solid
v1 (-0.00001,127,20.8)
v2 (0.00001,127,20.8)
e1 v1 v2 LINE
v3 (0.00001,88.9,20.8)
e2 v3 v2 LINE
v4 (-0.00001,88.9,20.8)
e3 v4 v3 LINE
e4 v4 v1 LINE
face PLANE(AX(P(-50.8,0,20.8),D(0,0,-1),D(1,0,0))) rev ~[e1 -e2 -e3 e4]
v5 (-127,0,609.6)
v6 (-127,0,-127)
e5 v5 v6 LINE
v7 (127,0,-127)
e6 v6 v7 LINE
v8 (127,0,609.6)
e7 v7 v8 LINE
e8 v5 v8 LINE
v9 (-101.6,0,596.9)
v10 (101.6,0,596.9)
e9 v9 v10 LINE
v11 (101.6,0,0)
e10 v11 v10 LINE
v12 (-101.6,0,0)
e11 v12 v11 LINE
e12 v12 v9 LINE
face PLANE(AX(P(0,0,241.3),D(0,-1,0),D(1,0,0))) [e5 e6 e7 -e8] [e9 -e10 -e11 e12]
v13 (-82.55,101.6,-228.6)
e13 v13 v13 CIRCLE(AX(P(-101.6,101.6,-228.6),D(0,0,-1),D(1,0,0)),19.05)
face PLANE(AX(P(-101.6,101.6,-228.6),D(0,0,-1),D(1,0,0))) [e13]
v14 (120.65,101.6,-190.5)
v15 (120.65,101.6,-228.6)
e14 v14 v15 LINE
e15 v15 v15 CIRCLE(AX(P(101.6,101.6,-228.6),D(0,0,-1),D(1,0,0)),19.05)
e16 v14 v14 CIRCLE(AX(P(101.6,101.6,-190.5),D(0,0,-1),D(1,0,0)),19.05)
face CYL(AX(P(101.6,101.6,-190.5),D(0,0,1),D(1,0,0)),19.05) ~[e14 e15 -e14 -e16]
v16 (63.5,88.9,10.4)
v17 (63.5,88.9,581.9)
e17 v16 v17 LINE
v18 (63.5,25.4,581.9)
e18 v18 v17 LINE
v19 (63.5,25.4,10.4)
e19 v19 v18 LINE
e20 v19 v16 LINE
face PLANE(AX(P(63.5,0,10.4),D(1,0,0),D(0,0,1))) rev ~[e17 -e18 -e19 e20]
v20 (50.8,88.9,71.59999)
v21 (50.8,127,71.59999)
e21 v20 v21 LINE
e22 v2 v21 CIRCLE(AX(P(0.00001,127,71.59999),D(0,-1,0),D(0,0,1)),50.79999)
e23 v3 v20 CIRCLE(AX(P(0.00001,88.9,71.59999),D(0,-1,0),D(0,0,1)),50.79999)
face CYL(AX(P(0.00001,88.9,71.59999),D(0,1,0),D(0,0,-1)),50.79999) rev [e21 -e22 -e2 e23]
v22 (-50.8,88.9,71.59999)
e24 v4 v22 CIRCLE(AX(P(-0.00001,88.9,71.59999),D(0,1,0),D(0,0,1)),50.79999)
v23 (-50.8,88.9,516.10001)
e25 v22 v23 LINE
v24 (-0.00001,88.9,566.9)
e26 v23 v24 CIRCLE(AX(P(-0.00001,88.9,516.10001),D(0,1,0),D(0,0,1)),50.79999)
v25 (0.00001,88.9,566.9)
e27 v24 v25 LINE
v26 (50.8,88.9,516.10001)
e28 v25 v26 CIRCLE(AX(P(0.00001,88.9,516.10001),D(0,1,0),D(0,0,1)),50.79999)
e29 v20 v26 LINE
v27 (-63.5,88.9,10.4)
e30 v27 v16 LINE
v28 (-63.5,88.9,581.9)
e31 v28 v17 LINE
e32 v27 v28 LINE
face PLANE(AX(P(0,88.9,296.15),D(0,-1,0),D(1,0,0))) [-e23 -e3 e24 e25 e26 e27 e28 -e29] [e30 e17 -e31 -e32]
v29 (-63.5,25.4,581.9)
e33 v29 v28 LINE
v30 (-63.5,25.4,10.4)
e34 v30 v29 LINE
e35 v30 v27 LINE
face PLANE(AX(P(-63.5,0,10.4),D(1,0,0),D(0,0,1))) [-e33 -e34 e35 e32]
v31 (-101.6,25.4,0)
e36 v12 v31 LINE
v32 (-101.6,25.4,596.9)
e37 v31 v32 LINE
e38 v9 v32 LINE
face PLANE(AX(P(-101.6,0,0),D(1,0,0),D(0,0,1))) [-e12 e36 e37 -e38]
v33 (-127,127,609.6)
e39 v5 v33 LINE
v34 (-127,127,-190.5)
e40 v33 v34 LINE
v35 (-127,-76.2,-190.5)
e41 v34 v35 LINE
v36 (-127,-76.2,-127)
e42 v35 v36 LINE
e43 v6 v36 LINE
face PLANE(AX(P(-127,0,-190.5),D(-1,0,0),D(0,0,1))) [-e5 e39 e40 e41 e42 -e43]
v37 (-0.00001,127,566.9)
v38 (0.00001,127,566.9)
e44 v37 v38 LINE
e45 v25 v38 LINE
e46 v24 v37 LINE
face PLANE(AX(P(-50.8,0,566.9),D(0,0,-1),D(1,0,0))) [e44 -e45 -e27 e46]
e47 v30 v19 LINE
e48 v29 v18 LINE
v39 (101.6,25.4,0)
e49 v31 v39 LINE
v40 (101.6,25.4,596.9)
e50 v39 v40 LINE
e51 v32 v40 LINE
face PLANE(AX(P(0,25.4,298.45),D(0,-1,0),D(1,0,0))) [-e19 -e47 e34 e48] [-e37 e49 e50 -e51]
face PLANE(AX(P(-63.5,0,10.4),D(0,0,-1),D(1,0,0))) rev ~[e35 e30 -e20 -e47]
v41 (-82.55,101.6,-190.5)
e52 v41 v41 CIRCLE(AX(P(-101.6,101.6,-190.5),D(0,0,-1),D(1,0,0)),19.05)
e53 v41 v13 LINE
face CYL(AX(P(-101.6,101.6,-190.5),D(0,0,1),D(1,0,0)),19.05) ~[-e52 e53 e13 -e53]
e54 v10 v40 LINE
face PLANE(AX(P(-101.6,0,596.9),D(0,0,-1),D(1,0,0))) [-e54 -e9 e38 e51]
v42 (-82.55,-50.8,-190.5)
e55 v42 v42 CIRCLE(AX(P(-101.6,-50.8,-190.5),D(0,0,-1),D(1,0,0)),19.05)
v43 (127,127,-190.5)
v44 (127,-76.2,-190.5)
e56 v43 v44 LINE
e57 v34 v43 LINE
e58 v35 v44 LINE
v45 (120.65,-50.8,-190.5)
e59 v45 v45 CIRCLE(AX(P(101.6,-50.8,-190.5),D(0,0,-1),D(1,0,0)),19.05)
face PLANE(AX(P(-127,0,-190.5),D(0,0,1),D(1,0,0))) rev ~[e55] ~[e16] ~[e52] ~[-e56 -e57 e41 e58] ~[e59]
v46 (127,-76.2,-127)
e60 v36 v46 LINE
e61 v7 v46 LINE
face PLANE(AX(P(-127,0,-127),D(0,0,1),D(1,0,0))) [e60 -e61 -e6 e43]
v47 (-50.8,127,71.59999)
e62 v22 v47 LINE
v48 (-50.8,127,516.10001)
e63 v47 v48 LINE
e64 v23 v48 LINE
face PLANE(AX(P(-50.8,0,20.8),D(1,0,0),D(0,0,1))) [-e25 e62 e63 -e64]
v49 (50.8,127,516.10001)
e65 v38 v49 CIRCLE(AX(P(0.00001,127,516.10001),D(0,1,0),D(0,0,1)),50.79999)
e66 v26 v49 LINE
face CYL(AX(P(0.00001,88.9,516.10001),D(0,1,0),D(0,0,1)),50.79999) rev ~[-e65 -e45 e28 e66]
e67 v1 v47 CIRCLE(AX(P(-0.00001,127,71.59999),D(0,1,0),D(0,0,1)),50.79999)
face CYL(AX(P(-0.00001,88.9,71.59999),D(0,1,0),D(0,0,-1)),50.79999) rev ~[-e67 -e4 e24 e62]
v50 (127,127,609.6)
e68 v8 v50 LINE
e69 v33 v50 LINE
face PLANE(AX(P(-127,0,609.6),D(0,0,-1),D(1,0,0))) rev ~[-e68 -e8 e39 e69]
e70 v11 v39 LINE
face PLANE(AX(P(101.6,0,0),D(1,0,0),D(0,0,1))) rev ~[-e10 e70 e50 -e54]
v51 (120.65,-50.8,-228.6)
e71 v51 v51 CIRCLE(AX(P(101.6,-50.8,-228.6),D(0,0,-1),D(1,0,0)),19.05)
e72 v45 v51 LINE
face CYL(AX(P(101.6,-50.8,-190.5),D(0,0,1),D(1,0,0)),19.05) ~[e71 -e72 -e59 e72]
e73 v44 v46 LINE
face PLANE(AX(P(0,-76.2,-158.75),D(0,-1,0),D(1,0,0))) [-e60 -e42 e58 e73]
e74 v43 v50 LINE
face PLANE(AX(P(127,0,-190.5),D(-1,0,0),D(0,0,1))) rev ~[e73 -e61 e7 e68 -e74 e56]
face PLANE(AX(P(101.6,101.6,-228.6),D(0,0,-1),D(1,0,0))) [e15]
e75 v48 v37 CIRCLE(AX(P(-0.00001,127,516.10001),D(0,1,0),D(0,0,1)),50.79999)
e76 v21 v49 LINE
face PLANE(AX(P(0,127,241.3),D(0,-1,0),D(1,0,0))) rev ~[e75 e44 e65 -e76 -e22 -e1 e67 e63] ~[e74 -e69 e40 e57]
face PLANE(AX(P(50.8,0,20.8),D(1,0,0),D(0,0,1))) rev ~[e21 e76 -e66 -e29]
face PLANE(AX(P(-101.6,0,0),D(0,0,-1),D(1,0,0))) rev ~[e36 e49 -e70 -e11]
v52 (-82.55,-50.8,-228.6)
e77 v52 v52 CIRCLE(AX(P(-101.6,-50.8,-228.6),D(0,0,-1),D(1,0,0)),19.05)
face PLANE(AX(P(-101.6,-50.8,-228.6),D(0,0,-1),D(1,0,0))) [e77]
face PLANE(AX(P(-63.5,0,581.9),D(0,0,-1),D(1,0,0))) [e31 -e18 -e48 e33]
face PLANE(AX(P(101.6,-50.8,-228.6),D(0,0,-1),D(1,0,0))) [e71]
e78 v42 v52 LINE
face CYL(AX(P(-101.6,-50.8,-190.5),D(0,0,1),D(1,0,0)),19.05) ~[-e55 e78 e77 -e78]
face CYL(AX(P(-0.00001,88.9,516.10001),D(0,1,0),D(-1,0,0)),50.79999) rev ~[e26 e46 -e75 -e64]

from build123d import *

# Parameters (mm, degrees)
F0_W     = 254
F0_H     = 736.6
F0_W_2   = 203.2
F0_H_2   = 596.9
F0_W_3   = 127
F0_H_3   = 571.5
F0_W_4   = 101.6
F0_H_4   = 546.1
F0_H_5   = 63.5
F1_DEPTH = 127
F2_DEPTH = 25.4
F3_DEPTH = 88.9
F4_R     = 50.79999
F5_DEPTH = 76.2
F6_R     = 19.05
F7_DEPTH = 38.1


# Not quite as in the source:
# - a fillet or chamfer is up to 0.001 mm smaller than in the source, because OpenCascade refuses the exact size
# - a feature names something its author has since deleted; it is built from what else it names


with BuildPart() as f1:
    # F0 (on Front) → F1 (new body)
    with BuildSketch(Plane.XZ):
        with Locations((0, 241.3)):
            Rectangle(F0_W, F0_H)
        with Locations((0, 298.45)):
            Rectangle(F0_W_2, F0_H_2, mode=Mode.SUBTRACT)
        with Locations((0, 298.45)):
            Rectangle(F0_W_2, F0_H_2)
        with Locations((0, 296.15)):
            Rectangle(F0_W_3, F0_H_3, mode=Mode.SUBTRACT)
        with Locations((0, 296.15)):
            Rectangle(F0_W_3, F0_H_3)
        with Locations((0, 293.85)):
            Rectangle(F0_W_4, F0_H_4, mode=Mode.SUBTRACT)
        with Locations((0, -158.75)):
            Rectangle(F0_W, F0_H_5)
    extrude(amount=-F1_DEPTH)

    # F0 (on Front) → F2 (cut)
    with BuildSketch(Plane.XZ):
        with Locations((0, 298.45)):
            Rectangle(F0_W_2, F0_H_2)
        with Locations((0, 296.15)):
            Rectangle(F0_W_3, F0_H_3, mode=Mode.SUBTRACT)
    extrude(amount=-F2_DEPTH, mode=Mode.SUBTRACT)

    # F0 (on Front) → F3 (cut)
    with BuildSketch(Plane.XZ):
        with Locations((0, 296.15)):
            Rectangle(F0_W_3, F0_H_3)
        with Locations((0, 293.85)):
            Rectangle(F0_W_4, F0_H_4, mode=Mode.SUBTRACT)
    extrude(amount=-F3_DEPTH, mode=Mode.SUBTRACT)

    # F4 (radius 50.8 in the source; OpenCascade refuses exactly that, so slightly less here)
    f4_edges = [f1.edges().sort_by_distance(p)[0] for p in [
        (50.8, 107.95, 566.9),
        (-50.8, 107.95, 566.9),
        (-50.8, 107.95, 20.8),
        (50.8, 107.95, 20.8),
    ]]
    fillet(f4_edges, radius=F4_R)

    # F0 (on Front) → F5 (join)
    with BuildSketch(Plane.XZ):
        with Locations((0, -158.75)):
            Rectangle(F0_W, F0_H_5)
    extrude(amount=F5_DEPTH)

    # F6 (on face) → F7 (join)
    with BuildSketch(Plane(origin=(0, 0, -190.5), x_dir=(1, 0, 0), z_dir=(0, 0, -1))):
        with Locations((-101.6, 50.8)):
            Circle(F6_R)
        with Locations((101.6, 50.8)):
            Circle(F6_R)
        with Locations((-101.6, -101.6)):
            Circle(F6_R)
        with Locations((101.6, -101.6)):
            Circle(F6_R)
    extrude(amount=F7_DEPTH)


solid = f1.part
